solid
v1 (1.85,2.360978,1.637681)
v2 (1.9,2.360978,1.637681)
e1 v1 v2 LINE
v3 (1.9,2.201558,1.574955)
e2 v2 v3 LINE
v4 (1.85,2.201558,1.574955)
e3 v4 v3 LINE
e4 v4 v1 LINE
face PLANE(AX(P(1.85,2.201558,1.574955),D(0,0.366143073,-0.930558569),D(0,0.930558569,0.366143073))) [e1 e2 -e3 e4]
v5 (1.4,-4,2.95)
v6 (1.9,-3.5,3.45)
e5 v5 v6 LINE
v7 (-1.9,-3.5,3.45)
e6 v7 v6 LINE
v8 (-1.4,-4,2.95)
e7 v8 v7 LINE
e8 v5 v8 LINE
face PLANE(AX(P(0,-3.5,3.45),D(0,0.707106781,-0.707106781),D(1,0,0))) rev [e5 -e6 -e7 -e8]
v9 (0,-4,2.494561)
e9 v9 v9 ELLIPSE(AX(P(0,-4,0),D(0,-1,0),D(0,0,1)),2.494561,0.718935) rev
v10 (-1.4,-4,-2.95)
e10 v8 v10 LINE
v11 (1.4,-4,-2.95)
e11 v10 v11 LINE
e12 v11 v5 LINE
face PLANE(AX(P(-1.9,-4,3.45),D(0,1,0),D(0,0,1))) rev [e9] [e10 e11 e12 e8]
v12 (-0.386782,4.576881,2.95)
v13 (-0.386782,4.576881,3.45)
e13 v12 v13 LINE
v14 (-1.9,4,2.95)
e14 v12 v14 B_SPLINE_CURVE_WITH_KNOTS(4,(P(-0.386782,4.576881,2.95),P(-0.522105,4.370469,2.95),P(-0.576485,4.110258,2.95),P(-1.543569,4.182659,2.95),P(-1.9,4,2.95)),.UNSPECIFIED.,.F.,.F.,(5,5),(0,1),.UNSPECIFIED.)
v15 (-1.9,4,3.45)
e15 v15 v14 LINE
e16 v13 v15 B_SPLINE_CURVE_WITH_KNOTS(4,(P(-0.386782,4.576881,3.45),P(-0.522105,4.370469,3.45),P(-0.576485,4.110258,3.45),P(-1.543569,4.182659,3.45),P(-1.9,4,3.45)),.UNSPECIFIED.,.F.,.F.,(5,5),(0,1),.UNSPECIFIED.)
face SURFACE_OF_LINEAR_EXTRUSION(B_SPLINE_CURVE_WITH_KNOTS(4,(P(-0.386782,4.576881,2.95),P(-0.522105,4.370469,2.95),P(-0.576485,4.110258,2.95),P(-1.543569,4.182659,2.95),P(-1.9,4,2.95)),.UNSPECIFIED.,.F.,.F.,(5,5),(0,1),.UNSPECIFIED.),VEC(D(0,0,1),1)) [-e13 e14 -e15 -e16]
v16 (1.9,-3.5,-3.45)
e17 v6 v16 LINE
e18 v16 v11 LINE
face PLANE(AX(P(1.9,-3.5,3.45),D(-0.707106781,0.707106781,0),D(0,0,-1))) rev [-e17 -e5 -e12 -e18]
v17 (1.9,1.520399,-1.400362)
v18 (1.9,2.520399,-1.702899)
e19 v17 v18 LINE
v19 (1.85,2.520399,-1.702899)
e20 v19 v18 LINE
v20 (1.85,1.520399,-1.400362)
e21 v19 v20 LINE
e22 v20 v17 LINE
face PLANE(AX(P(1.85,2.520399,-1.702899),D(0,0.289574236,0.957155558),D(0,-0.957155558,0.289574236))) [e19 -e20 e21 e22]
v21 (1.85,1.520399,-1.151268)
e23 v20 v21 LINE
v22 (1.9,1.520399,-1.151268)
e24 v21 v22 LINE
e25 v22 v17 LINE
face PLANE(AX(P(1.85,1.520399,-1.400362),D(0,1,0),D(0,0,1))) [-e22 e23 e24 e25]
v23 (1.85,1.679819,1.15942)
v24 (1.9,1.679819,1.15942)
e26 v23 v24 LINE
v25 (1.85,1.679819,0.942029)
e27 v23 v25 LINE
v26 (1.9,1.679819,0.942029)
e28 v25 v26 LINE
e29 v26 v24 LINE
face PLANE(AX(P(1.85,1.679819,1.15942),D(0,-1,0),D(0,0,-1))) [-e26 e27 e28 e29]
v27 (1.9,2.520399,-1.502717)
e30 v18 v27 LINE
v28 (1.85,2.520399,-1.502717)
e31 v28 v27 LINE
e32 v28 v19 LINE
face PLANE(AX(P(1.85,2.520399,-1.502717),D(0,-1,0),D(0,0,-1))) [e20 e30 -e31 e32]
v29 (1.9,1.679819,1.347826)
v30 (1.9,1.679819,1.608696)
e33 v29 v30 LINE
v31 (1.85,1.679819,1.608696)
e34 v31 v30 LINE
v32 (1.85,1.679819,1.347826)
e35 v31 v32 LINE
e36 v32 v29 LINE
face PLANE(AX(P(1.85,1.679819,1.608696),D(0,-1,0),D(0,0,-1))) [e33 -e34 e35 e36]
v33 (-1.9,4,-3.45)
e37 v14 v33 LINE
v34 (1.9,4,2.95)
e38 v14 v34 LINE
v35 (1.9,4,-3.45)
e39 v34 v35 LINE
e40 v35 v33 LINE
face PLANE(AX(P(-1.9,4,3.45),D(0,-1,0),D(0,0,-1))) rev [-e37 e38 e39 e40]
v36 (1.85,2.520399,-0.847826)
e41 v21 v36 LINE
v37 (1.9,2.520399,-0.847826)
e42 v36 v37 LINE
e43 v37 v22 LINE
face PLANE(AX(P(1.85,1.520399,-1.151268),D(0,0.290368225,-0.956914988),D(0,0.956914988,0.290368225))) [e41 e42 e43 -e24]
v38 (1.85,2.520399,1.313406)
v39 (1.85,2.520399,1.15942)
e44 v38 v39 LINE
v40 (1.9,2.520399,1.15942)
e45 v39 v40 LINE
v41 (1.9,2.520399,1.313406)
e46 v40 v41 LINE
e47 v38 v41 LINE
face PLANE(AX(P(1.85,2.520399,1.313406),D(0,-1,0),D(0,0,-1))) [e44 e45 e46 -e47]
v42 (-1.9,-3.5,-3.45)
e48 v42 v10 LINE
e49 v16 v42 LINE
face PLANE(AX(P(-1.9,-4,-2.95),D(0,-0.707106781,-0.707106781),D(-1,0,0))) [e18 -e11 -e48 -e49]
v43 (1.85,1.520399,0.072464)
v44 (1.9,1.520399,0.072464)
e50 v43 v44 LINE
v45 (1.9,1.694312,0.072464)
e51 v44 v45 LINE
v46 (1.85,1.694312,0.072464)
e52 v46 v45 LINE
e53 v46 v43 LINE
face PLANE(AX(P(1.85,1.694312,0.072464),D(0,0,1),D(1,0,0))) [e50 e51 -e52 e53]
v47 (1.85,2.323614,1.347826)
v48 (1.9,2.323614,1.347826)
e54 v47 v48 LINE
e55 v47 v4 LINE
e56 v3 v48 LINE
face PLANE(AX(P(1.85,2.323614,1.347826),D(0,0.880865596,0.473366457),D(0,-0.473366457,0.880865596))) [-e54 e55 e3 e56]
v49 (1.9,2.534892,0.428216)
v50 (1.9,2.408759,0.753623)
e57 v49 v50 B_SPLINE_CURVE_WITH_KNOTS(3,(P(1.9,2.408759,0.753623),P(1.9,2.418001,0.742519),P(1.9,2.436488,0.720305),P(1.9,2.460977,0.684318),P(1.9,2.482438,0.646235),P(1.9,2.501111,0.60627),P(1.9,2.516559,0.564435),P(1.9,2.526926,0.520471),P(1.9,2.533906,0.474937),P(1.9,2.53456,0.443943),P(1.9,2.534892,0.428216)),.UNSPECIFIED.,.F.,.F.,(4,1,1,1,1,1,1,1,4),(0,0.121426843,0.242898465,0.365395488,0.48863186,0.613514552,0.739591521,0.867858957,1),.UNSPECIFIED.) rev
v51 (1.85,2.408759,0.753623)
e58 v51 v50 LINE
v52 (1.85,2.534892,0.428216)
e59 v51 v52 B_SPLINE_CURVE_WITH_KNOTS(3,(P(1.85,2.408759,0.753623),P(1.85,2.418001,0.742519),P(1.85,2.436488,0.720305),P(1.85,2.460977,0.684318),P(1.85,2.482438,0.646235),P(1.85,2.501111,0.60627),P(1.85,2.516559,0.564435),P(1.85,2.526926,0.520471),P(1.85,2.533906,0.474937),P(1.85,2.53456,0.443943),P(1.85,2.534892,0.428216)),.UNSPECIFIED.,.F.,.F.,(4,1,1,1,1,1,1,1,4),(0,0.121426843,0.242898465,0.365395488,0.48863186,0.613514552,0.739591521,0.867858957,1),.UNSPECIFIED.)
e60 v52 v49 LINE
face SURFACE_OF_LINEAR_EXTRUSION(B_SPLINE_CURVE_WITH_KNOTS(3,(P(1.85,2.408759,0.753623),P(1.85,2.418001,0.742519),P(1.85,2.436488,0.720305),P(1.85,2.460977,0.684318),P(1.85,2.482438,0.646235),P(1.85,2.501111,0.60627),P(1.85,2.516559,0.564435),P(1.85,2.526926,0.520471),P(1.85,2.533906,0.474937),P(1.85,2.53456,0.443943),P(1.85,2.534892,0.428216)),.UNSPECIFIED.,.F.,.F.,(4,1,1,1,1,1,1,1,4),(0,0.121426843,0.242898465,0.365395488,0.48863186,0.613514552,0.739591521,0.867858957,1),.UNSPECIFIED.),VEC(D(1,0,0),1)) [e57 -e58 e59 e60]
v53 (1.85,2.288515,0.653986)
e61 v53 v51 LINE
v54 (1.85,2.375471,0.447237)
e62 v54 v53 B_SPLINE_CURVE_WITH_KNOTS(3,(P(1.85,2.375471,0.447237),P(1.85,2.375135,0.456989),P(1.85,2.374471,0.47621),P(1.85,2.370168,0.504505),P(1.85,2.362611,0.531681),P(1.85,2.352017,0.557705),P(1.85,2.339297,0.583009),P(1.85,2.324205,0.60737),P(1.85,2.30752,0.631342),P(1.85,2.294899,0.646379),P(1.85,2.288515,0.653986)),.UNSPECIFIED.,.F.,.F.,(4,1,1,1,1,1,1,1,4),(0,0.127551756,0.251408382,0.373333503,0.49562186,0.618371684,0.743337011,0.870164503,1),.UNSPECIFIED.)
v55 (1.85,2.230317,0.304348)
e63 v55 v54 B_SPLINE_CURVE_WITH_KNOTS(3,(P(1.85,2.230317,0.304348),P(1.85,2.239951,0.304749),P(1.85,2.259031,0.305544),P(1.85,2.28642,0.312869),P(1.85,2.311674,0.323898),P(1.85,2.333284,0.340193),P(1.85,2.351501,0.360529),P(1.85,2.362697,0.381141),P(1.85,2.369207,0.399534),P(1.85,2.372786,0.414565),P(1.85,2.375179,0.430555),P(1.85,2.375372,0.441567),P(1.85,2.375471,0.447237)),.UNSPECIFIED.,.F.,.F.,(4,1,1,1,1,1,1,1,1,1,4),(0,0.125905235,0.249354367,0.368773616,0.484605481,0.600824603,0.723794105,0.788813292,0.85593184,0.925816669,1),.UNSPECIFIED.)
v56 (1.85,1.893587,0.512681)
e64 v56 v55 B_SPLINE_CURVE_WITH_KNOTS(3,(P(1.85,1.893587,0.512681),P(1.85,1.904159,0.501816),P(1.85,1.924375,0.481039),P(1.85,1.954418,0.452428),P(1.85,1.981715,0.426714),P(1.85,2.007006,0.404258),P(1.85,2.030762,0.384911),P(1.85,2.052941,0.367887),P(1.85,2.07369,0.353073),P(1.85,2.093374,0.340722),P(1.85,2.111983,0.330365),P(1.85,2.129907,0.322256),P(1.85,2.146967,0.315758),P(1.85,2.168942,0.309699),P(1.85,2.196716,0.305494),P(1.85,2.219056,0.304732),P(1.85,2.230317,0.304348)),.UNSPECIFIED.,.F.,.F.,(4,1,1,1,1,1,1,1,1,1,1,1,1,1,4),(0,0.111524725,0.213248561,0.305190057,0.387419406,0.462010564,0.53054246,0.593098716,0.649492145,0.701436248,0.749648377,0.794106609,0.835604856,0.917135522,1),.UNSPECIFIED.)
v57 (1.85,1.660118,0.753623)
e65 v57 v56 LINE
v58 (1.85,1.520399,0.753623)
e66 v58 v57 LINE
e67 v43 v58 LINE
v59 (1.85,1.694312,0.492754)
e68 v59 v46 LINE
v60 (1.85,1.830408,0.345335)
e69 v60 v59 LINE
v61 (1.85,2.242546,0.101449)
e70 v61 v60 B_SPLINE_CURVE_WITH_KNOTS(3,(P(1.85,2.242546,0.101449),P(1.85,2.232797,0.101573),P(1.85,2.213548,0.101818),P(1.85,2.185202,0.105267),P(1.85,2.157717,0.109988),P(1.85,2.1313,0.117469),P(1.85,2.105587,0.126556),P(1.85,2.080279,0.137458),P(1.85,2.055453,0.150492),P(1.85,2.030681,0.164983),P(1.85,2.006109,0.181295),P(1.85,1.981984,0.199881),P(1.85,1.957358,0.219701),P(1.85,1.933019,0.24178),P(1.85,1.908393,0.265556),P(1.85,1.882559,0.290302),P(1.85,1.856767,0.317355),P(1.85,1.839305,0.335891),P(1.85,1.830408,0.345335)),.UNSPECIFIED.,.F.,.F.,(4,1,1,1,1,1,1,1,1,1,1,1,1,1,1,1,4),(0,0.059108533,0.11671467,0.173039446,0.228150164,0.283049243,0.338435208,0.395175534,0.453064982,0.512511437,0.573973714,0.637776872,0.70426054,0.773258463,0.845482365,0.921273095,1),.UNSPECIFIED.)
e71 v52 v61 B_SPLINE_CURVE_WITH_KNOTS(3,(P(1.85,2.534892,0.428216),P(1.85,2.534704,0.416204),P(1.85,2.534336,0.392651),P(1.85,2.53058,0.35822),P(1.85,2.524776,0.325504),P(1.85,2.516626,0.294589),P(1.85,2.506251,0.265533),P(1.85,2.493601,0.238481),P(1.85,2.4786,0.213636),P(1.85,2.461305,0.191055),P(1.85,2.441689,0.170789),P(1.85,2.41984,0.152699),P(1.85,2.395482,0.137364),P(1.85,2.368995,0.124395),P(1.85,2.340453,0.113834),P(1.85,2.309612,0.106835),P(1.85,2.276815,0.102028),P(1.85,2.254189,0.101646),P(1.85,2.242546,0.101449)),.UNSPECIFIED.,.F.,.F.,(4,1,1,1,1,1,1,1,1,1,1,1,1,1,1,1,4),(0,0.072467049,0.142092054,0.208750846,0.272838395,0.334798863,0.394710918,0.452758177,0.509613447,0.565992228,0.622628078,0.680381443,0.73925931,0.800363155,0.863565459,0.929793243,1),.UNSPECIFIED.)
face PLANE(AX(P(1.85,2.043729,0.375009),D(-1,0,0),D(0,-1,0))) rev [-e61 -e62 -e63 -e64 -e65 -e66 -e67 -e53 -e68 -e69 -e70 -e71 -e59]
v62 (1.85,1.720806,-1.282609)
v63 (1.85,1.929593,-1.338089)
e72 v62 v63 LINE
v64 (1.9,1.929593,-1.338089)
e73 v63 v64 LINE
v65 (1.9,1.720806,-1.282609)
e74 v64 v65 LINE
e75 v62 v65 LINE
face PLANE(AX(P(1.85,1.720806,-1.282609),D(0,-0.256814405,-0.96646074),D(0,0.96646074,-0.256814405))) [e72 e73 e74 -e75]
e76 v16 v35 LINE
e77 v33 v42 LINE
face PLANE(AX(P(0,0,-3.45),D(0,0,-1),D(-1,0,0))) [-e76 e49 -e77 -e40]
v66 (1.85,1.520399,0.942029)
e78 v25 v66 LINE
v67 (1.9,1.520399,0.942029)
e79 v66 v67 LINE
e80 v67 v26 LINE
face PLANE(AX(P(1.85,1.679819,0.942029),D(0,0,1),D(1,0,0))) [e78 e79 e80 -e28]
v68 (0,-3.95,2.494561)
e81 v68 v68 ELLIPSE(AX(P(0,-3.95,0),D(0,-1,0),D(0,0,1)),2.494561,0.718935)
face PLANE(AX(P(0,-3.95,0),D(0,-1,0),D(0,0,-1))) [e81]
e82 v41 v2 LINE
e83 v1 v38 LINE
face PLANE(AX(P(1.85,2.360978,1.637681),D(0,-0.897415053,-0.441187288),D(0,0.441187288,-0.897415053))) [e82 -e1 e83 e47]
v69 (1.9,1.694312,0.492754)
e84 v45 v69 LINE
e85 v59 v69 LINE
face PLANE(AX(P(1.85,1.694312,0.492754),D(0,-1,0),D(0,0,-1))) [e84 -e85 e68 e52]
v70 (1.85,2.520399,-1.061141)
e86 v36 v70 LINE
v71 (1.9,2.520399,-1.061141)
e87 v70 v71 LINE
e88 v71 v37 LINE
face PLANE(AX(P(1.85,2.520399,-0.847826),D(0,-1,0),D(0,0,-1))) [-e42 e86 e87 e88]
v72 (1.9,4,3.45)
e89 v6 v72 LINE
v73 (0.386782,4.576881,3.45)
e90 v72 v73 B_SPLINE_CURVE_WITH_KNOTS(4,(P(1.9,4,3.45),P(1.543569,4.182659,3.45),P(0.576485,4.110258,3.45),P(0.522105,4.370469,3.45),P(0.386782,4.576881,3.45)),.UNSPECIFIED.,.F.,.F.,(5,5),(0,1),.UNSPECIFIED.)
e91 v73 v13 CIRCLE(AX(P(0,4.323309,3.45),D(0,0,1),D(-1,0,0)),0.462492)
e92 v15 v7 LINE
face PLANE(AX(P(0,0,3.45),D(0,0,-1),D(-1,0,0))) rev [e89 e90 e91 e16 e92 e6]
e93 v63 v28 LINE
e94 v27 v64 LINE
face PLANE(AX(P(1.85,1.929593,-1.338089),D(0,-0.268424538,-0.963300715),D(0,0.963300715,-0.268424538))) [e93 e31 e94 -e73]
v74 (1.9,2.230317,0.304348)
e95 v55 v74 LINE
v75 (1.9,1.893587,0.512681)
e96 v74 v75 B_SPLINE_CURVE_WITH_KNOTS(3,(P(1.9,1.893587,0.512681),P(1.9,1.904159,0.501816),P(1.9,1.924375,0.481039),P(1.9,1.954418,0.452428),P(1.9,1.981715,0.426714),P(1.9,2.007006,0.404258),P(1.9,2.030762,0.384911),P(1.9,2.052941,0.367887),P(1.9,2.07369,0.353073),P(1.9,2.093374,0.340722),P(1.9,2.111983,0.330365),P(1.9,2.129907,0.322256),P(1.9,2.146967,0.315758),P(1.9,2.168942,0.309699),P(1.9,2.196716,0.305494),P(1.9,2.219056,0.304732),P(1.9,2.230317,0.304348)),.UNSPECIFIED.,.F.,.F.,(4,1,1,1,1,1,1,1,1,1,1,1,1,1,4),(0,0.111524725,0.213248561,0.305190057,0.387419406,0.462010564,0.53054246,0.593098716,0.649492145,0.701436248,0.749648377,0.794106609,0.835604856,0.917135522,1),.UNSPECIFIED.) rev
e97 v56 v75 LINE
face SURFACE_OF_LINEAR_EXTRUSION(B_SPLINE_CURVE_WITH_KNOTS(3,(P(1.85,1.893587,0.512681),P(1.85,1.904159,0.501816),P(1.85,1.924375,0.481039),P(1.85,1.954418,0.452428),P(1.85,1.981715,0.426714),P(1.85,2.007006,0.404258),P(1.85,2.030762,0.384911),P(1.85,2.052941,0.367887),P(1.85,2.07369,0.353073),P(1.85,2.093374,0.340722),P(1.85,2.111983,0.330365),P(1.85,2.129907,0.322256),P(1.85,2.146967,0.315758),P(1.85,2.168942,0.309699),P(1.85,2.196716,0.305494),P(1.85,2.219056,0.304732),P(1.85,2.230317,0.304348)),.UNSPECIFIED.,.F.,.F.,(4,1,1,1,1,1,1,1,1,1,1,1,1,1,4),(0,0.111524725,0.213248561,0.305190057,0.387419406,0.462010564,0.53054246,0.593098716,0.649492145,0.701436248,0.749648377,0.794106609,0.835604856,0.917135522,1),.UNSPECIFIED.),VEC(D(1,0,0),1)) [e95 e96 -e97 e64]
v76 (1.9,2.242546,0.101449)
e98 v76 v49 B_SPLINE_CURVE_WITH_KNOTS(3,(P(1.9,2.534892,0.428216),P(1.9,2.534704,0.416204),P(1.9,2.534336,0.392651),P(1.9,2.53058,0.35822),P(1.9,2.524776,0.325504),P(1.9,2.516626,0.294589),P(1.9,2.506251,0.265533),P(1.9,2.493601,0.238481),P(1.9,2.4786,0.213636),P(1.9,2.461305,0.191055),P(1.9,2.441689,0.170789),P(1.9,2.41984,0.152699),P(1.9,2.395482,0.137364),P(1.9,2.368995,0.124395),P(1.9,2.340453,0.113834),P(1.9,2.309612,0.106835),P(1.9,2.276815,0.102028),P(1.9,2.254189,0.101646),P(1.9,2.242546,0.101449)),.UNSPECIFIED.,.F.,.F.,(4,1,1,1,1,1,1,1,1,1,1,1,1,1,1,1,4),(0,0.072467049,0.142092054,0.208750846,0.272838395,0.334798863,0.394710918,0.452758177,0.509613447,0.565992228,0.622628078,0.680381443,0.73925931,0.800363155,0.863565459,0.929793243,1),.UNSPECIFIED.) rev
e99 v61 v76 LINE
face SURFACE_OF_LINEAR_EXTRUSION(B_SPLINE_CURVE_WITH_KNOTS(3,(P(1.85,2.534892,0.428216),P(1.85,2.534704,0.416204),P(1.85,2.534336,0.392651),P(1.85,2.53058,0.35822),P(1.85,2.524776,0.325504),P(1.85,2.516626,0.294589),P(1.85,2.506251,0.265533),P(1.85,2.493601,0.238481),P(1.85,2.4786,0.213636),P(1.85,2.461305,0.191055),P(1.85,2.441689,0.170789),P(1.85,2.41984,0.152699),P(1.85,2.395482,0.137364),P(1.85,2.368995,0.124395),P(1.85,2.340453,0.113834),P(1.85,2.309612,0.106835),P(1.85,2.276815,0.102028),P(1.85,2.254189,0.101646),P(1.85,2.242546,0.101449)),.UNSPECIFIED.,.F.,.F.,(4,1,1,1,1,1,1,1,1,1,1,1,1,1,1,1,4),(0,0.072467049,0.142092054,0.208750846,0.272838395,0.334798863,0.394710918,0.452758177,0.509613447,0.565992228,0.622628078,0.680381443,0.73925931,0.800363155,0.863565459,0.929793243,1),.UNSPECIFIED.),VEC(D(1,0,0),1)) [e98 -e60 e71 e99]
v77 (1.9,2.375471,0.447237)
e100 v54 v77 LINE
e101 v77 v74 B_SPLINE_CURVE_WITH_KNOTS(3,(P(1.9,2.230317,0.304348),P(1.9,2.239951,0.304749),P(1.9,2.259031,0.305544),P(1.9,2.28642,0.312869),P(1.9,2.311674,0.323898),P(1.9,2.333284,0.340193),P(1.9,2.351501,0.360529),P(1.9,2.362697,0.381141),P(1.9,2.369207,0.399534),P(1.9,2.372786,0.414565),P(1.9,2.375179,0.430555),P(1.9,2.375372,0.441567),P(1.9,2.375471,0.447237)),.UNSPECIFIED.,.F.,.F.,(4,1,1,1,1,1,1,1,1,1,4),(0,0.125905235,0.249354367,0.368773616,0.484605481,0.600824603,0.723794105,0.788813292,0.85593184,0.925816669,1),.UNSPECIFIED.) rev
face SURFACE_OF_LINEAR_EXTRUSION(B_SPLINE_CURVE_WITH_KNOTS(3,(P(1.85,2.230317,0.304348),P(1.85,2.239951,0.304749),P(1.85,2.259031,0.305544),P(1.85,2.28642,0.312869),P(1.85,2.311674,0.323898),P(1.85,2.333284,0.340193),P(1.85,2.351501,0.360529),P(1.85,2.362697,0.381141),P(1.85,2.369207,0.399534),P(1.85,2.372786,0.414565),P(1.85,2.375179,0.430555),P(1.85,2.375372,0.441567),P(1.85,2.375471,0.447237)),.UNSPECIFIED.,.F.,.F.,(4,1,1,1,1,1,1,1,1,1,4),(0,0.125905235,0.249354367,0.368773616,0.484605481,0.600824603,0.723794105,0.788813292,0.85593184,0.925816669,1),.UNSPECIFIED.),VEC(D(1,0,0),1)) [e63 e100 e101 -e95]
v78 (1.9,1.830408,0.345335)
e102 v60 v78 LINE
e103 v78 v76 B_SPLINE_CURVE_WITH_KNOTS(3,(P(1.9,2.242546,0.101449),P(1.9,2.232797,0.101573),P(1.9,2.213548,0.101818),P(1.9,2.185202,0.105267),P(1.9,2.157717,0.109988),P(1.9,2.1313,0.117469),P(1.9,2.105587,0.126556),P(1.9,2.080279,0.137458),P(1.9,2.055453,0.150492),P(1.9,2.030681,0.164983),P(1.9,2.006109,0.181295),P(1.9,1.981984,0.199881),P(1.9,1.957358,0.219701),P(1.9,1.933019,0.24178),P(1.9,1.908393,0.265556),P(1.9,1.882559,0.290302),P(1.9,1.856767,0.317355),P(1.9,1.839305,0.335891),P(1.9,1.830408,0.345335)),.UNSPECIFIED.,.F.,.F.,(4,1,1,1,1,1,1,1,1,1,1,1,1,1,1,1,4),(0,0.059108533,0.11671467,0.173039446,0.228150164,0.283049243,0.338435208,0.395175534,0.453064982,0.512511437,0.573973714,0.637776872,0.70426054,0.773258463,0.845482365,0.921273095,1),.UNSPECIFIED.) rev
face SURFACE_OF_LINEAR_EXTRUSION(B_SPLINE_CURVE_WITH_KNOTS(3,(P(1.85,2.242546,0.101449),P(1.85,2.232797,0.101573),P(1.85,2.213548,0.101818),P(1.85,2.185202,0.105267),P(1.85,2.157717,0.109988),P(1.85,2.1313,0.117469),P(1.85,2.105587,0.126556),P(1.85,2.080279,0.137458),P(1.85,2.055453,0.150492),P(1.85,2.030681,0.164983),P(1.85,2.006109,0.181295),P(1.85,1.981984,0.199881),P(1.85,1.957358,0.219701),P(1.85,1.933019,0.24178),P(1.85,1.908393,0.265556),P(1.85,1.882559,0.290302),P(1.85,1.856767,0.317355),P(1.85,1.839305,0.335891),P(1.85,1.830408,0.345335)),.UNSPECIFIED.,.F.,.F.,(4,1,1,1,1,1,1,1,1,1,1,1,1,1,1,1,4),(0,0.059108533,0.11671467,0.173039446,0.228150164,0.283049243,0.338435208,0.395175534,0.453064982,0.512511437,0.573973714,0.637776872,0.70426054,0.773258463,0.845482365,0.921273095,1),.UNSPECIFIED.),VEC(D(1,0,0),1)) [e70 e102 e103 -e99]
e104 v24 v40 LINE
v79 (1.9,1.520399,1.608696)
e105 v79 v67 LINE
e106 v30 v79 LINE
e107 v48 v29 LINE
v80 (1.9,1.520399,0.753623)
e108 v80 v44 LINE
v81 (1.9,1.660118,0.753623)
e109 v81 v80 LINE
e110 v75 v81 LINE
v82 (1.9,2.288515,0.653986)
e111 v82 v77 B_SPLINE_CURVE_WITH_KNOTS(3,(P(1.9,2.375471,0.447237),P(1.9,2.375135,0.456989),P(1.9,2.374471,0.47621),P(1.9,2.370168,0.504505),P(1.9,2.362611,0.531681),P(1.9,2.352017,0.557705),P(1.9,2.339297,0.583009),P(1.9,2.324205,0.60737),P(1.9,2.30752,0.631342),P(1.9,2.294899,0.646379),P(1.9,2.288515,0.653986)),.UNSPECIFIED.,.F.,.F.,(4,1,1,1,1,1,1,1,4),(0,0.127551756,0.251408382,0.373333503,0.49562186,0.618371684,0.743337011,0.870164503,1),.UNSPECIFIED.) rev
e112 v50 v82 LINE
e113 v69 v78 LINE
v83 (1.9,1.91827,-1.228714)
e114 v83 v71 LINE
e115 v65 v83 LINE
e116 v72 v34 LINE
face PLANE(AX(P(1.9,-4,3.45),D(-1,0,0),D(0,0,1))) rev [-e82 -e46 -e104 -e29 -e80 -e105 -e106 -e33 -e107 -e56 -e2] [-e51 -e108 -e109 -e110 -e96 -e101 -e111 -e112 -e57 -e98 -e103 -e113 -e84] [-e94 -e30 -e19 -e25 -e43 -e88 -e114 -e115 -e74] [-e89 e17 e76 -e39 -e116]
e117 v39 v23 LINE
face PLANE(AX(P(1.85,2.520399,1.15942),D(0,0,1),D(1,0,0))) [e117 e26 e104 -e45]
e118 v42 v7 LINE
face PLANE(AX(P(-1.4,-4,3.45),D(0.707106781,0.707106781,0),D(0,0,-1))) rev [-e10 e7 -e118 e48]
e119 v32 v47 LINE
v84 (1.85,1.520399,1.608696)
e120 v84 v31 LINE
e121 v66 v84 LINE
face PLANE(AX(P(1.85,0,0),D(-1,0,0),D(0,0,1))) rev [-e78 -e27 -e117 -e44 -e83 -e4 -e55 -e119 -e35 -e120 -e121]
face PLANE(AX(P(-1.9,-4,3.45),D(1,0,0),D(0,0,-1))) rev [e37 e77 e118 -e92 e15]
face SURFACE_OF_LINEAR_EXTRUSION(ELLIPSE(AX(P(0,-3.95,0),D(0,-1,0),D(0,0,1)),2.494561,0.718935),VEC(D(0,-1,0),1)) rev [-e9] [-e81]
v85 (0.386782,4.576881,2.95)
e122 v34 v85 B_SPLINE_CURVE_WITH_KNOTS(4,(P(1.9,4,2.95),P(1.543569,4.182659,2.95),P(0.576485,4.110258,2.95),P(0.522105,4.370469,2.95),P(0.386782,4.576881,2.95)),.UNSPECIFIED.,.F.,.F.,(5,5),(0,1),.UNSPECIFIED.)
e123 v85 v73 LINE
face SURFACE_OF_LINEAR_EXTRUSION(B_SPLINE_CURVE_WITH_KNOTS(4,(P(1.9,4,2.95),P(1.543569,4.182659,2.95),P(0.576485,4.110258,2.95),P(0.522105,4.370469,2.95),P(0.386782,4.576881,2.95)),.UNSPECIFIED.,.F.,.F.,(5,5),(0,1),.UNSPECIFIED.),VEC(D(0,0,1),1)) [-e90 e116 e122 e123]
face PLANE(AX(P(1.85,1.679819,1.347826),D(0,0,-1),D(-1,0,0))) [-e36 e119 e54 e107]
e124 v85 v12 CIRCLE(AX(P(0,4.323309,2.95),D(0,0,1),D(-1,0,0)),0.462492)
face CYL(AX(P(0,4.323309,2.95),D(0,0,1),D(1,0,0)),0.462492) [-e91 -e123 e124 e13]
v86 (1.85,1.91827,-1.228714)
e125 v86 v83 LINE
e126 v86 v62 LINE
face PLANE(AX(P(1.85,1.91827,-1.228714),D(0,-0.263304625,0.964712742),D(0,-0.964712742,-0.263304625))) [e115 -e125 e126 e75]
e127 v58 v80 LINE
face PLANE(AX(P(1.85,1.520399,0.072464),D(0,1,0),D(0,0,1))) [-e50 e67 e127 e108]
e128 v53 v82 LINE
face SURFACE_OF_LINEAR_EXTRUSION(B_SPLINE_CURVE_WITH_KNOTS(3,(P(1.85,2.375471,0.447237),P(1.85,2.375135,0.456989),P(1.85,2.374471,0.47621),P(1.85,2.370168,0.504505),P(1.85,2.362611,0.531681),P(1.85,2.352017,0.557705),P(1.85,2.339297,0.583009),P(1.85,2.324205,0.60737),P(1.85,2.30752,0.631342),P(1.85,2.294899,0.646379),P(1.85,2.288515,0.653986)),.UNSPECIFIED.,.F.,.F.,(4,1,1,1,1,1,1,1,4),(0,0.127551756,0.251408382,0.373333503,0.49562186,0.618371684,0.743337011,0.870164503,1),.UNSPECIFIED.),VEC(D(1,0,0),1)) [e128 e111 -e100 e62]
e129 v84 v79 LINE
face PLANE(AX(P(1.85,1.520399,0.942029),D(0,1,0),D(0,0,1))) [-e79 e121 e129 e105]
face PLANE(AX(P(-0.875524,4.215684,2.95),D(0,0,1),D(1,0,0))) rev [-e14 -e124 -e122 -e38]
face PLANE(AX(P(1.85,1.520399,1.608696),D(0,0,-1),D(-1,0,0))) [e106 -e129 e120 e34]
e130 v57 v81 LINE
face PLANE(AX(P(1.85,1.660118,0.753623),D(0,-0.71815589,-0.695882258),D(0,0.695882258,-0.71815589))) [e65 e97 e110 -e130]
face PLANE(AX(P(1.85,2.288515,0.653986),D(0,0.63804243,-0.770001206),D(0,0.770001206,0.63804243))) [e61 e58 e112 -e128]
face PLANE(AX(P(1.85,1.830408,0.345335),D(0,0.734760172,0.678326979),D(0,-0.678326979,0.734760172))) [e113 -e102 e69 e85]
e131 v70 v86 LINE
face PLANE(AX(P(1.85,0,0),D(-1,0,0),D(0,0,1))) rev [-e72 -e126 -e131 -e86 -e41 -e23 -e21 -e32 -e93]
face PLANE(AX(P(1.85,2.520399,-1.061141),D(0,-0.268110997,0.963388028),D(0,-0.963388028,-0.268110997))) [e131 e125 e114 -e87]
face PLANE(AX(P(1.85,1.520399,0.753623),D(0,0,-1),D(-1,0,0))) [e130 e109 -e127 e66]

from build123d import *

# Parameters (mm, degrees)
SKETCH1_W           = 3.8
SKETCH1_H           = 8
BOSS_EXTRUDE1_DEPTH = 3.45
BOSS_EXTRUDE3_START = -0.5
BOSS_EXTRUDE3_DEPTH = 0.5
CHAMFER2_SIZE       = 0.5
SKETCH8_RX          = 2.494560644
SKETCH8_RY          = 0.718935273
CUT_EXTRUDE2_DEPTH  = 0.05
CUT_EXTRUDE3_DEPTH  = 0.05


# Read off the part's stored shape, not the designer's step: Boss-Extrude3
with BuildPart() as part:
    # Sketch1 → Boss-Extrude1 (new, symmetric)
    with BuildSketch(Plane.XY):
        Rectangle(SKETCH1_W, SKETCH1_H)
    extrude(amount=BOSS_EXTRUDE1_DEPTH, both=True)

    # Boss-Extrude3 outline → Boss-Extrude3 (add)
    with BuildSketch(Plane.XY.offset(3.45).offset(BOSS_EXTRUDE3_START)):
        with BuildLine():
            ThreePointArc((0.386782268, 4.576881383), (0, 4.785801899), (-0.386782268, 4.576881383))
            add(Edge.make_bspline(
                [(-0.386782268, 4.576881383), (-0.522104533, 4.370469494), (-0.576485167, 4.110258291), (-1.543568904, 4.182658763), (-1.9, 4)],
                knots=[0, 0, 0, 0, 0, 1, 1, 1, 1, 1], degree=4))
            Line((-1.9, 4), (1.9, 4))
            add(Edge.make_bspline(
                [(1.9, 4), (1.543568904, 4.182658763), (0.576485167, 4.110258291), (0.522104533, 4.370469494), (0.386782268, 4.576881383)],
                knots=[0, 0, 0, 0, 0, 1, 1, 1, 1, 1], degree=4))
        make_face()
    extrude(amount=BOSS_EXTRUDE3_DEPTH)

    # Chamfer2
    chamfer2_edges = [part.edges().sort_by_distance(p)[0] for p in [
        (0, -4, 3.45),
        (0, -4, -3.45),
        (1.9, -4, 0),
        (-1.9, -4, 0),
    ]]
    chamfer(chamfer2_edges, length=CHAMFER2_SIZE)

    # Sketch8 → Cut-Extrude2 (cut, symmetric)
    with BuildSketch(Plane.XZ.offset(4)):
        with Locations(Location((0, 0), (0, 0, 90))):
            Ellipse(SKETCH8_RX, SKETCH8_RY)
    extrude(amount=CUT_EXTRUDE2_DEPTH, both=True, mode=Mode.SUBTRACT)

    # Sketch9 → Cut-Extrude3 (cut, symmetric)
    with BuildSketch(Plane(origin=(1.9, 0, 0), x_dir=(0, 0, -1), z_dir=(1, 0, 0))):
        Polygon((-1.608695652, 1.52039879), (-1.608695652, 1.67981908), (-1.347826087, 1.67981908), (-1.347826087, 2.32361437), (-1.57495471, 2.20155821), (-1.637681159, 2.3609785), (-1.313405797, 2.52039879), (-1.15942029, 2.52039879), (-1.15942029, 1.67981908), (-0.942028986, 1.67981908), (-0.942028986, 1.52039879), align=None)
        with BuildLine():
            Line((-0.753623188, 1.52039879), (-0.753623188, 1.660117993))
            Line((-0.753623188, 1.660117993), (-0.512681159, 1.893587196))
            add(Edge.make_bspline(
                [(-0.512681159, 1.893587196), (-0.5018156, 1.904159463), (-0.481039355, 1.924374897), (-0.452427524, 1.954418318), (-0.426714142, 1.981714894), (-0.404257947, 2.007005685), (-0.384911278, 2.030762388), (-0.367887318, 2.052940622), (-0.35307316, 2.073689639), (-0.340721742, 2.093374099), (-0.330364569, 2.111983404), (-0.322256202, 2.129907311), (-0.31575837, 2.146967443), (-0.309698908, 2.168941676), (-0.305493732, 2.196715837), (-0.304731855, 2.219056371), (-0.304347826, 2.230317268)],
                knots=[0, 0, 0, 0, 1.561346149, 2.985479849, 4.272660798, 5.42387168, 6.4681479, 7.427594435, 8.303382019, 9.092890023, 9.820107477, 10.495077279, 11.117492523, 11.698467986, 12.839897307, 14, 14, 14, 14], degree=3))
            add(Edge.make_bspline(
                [(-0.304347826, 2.230317268), (-0.304749324, 2.239951277), (-0.305544487, 2.259031359), (-0.312869331, 2.286419819), (-0.32389769, 2.31167432), (-0.340192786, 2.333284373), (-0.360528944, 2.351500926), (-0.381140537, 2.36269725), (-0.399534406, 2.369207499), (-0.414564764, 2.372786302), (-0.430554514, 2.375179437), (-0.44156686, 2.375372066), (-0.447237319, 2.375471254)],
                knots=[0, 0, 0, 0, 1.259052347, 2.493543675, 3.687736162, 4.846054809, 6.008246034, 7.237941048, 7.888132915, 8.5593184, 9.258166694, 10, 10, 10, 10], degree=3))
            add(Edge.make_bspline(
                [(-0.447237319, 2.375471254), (-0.456988906, 2.375134553), (-0.476209579, 2.374470906), (-0.504504735, 2.370167962), (-0.531680703, 2.362610737), (-0.557705297, 2.352017107), (-0.583009083, 2.339296512), (-0.607369703, 2.324204601), (-0.631341549, 2.307520425), (-0.646378777, 2.294899268), (-0.653985507, 2.288514732)],
                knots=[0, 0, 0, 0, 1.020414048, 2.011267059, 2.986668027, 3.96497488, 4.94697347, 5.946696085, 6.961316025, 8, 8, 8, 8], degree=3))
            Line((-0.653985507, 2.288514732), (-0.753623188, 2.408759297))
            add(Edge.make_bspline(
                [(-0.753623188, 2.408759297), (-0.742518604, 2.418001221), (-0.72030534, 2.436488477), (-0.68431817, 2.460977212), (-0.646234813, 2.482437605), (-0.606269993, 2.50111137), (-0.564434736, 2.516559351), (-0.520470754, 2.52692615), (-0.474936737, 2.533905774), (-0.443942977, 2.534559711), (-0.42821558, 2.534891543)],
                knots=[0, 0, 0, 0, 0.971414743, 1.943187718, 2.923163908, 3.90905488, 4.908116413, 5.916732171, 6.942871654, 8, 8, 8, 8], degree=3))
            add(Edge.make_bspline(
                [(-0.42821558, 2.534891543), (-0.416203685, 2.534703898), (-0.392650983, 2.534335966), (-0.358220001, 2.530579803), (-0.325504013, 2.524775686), (-0.294589327, 2.516626165), (-0.265532929, 2.506251119), (-0.2384809, 2.493601472), (-0.213635967, 2.478599538), (-0.191054535, 2.461304731), (-0.17078899, 2.441689013), (-0.15269922, 2.419840212), (-0.137363523, 2.395482265), (-0.124395242, 2.368994948), (-0.113833889, 2.340452893), (-0.106835404, 2.309612456), (-0.102028057, 2.27681502), (-0.101645917, 2.254188651), (-0.101449275, 2.242545529)],
                knots=[0, 0, 0, 0, 1.159472778, 2.273472863, 3.340013536, 4.365414322, 5.356781803, 6.31537468, 7.244130825, 8.153815157, 9.055875647, 9.962049253, 10.886103095, 11.828148954, 12.805810483, 13.817047342, 14.876691883, 16, 16, 16, 16], degree=3))
            add(Edge.make_bspline(
                [(-0.101449275, 2.242545529), (-0.101573271, 2.232797158), (-0.10181811, 2.213548196), (-0.105266832, 2.185201632), (-0.109988074, 2.157717091), (-0.117468921, 2.131299919), (-0.126556111, 2.105586764), (-0.13745779, 2.08027856), (-0.150492092, 2.055452632), (-0.164982926, 2.030681159), (-0.181295483, 2.006109055), (-0.19988108, 1.981983737), (-0.219700719, 1.957357861), (-0.241779881, 1.933018624), (-0.265556322, 1.908393081), (-0.290302007, 1.882559449), (-0.317355297, 1.856767431), (-0.335891122, 1.839304984), (-0.345335145, 1.830407848)],
                knots=[0, 0, 0, 0, 0.945736526, 1.867434716, 2.768631143, 3.650402628, 4.528787893, 5.414963327, 6.32280855, 7.249039709, 8.200182995, 9.183579422, 10.204429958, 11.268168642, 12.372135405, 13.527717836, 14.740369513, 16, 16, 16, 16], degree=3))
            Line((-0.345335145, 1.830407848), (-0.492753623, 1.694311833))
            Line((-0.492753623, 1.694311833), (-0.072463768, 1.694311833))
            Line((-0.072463768, 1.694311833), (-0.072463768, 1.52039879))
            Line((-0.072463768, 1.52039879), (-0.753623188, 1.52039879))
        make_face()
        Polygon((1.400362319, 1.52039879), (1.151268116, 1.52039879), (0.847826087, 2.52039879), (1.061141304, 2.52039879), (1.228713768, 1.918270167), (1.282608696, 1.720806399), (1.338088768, 1.92959263), (1.502717391, 2.52039879), (1.702898551, 2.52039879), align=None)
    extrude(amount=CUT_EXTRUDE3_DEPTH, both=True, mode=Mode.SUBTRACT)


solid = part.part
